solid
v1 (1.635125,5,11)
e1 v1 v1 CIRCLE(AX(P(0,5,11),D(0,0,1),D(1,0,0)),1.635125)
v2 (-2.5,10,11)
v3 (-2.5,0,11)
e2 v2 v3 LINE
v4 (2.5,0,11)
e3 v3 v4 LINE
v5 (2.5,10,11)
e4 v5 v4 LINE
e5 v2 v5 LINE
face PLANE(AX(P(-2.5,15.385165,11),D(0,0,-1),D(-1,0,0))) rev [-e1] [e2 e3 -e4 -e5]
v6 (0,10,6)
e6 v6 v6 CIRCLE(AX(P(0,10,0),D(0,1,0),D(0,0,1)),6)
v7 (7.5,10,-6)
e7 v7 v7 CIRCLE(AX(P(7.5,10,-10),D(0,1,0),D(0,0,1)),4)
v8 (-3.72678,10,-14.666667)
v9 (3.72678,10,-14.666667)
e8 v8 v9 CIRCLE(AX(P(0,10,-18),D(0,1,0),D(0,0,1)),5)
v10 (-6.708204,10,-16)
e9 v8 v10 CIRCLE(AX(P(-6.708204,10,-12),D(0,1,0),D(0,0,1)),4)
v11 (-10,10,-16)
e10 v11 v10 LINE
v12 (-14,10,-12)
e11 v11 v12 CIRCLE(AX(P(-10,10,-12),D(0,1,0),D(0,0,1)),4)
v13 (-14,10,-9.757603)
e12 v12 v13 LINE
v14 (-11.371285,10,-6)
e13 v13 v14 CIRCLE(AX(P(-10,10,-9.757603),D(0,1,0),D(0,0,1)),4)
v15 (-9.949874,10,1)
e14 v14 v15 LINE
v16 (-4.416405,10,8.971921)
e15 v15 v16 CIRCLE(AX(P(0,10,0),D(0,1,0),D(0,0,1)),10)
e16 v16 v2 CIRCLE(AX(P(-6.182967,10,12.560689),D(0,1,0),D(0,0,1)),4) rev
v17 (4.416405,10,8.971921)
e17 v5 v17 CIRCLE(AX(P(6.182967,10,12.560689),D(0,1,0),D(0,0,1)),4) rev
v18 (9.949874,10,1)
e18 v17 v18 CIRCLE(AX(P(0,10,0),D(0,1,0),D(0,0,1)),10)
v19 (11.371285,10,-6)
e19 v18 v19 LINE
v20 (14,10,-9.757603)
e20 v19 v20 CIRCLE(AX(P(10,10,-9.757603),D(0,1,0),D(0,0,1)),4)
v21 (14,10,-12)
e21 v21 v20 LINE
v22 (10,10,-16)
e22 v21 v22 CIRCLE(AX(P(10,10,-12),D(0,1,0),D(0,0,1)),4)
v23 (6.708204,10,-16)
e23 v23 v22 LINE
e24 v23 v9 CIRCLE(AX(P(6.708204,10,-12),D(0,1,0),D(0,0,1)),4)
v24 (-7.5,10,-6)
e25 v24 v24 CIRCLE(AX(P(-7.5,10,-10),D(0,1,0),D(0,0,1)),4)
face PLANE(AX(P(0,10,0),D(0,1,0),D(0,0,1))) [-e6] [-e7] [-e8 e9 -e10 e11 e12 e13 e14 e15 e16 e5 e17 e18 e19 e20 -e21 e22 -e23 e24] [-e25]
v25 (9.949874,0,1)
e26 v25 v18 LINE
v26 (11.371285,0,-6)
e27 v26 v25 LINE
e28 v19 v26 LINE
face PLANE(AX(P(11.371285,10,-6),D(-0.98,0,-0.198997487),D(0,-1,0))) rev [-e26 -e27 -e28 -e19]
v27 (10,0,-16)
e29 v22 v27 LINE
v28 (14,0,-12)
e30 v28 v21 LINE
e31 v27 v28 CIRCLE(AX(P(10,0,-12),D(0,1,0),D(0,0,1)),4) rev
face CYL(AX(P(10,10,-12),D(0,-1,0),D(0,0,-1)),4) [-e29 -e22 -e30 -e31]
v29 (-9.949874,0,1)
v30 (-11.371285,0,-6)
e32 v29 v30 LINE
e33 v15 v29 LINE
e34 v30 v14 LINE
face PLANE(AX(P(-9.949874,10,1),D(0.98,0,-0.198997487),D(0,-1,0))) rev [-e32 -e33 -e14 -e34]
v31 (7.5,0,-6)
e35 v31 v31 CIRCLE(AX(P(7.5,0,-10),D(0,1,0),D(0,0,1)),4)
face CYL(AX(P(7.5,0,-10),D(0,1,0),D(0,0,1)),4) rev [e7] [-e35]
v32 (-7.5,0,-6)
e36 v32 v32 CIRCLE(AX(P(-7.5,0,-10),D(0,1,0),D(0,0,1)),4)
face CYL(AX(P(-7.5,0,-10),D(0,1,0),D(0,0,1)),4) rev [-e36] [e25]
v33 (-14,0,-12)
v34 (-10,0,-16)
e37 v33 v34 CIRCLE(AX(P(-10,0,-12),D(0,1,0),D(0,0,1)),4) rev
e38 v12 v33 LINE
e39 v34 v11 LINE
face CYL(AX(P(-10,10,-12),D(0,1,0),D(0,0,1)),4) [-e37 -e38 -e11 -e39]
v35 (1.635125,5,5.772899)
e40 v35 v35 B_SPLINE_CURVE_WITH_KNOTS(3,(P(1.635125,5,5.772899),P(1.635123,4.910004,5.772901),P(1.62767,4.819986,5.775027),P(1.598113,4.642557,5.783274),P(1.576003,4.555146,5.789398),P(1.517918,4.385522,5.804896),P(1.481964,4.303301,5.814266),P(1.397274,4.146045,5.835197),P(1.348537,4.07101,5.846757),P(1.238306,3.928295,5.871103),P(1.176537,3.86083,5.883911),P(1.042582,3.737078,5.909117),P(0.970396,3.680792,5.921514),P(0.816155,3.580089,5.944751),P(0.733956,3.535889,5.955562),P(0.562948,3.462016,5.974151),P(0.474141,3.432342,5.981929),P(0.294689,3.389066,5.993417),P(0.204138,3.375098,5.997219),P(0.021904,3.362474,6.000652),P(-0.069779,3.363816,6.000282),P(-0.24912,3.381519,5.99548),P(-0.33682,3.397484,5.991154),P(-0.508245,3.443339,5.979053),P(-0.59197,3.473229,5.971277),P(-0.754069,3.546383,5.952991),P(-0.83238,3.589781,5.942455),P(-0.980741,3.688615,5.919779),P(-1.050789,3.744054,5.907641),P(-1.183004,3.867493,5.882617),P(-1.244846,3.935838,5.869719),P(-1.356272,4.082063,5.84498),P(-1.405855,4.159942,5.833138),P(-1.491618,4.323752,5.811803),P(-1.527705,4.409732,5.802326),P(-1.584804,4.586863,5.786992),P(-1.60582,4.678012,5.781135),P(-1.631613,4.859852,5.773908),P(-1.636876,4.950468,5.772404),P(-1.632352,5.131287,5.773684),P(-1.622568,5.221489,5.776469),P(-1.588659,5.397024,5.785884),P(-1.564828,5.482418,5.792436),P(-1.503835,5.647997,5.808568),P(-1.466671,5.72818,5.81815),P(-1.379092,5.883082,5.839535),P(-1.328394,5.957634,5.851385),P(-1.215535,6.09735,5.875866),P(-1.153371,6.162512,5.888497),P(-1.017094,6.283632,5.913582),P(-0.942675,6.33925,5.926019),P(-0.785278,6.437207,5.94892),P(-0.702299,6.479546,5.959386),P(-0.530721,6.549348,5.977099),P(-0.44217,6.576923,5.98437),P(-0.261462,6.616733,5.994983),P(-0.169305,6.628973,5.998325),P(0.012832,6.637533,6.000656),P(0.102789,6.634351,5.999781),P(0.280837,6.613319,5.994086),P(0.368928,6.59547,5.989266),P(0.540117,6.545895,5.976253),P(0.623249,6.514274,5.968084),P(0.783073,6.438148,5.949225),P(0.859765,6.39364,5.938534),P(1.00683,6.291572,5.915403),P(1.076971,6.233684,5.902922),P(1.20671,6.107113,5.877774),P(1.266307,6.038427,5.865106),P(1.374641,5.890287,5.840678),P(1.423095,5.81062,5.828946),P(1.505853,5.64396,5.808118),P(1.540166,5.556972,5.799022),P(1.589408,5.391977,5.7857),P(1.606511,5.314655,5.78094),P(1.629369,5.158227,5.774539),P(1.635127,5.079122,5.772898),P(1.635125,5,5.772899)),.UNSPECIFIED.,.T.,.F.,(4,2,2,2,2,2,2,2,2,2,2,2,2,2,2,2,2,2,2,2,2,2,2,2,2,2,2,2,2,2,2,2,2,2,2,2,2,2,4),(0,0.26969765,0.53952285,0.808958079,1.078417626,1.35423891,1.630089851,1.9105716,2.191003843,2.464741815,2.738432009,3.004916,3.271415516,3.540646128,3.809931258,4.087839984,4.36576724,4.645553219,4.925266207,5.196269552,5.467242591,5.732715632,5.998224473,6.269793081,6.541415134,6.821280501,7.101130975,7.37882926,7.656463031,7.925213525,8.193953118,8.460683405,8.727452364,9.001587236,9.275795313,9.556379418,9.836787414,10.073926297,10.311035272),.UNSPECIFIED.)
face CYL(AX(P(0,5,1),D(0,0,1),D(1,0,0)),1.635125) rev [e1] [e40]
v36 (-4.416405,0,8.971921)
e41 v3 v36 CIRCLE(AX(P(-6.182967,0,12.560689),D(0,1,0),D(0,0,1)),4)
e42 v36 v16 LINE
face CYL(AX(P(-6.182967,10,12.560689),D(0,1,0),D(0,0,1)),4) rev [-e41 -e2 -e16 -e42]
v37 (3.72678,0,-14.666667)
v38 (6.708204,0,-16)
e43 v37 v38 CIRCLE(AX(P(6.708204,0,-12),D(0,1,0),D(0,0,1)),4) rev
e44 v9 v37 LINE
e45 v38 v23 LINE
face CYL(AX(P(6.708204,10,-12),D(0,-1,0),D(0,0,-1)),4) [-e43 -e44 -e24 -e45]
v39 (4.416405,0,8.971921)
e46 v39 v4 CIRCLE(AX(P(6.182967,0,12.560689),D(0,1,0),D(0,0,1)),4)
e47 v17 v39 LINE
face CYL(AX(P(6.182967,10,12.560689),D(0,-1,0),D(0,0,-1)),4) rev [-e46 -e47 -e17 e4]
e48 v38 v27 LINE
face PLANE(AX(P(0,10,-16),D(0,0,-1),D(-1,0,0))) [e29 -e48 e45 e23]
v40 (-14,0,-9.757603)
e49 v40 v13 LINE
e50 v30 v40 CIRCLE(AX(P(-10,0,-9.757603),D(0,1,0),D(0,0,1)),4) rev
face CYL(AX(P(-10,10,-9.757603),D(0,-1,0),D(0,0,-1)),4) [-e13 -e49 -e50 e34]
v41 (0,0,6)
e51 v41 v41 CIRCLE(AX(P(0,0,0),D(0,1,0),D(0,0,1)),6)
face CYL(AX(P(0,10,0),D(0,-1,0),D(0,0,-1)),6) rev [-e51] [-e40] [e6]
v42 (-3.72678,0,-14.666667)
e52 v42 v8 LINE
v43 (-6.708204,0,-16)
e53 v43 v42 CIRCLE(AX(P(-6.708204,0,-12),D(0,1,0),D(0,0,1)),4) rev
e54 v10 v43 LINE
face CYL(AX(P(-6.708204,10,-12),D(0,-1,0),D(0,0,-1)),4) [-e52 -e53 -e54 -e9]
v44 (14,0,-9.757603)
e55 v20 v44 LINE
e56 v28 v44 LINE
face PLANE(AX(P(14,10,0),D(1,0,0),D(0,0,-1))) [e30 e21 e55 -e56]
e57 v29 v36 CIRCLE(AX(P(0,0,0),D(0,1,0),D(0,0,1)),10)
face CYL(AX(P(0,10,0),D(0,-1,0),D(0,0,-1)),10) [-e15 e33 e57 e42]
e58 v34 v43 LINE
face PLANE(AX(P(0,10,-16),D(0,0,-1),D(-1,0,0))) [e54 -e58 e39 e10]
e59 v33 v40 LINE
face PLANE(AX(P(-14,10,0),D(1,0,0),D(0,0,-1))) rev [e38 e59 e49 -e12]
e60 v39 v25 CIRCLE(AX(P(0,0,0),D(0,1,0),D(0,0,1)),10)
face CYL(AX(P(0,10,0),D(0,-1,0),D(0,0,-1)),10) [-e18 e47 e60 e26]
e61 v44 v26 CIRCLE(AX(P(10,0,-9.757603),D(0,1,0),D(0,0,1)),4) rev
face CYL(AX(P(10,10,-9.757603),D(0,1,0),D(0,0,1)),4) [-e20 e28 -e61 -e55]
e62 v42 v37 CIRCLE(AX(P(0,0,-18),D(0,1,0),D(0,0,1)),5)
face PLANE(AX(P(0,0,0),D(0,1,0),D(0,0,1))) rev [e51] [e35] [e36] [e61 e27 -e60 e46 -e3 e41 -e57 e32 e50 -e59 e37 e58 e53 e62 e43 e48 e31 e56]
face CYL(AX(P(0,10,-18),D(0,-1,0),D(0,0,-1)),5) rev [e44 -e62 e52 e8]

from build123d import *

# Parameters (mm, degrees)
CROQUIS1_R              = 10
CROQUIS1_R_2            = 6
SALIENTE_EXTRUIR1_DEPTH = 10
CROQUIS2_R              = 4
CORTAR_EXTRUIR1_DEPTH   = 10
CHAFL_N1_DEPTH          = 10
CROQUIS3_W              = 5
CROQUIS3_H              = 2
SALIENTE_EXTRUIR2_DEPTH = 10
CROQUIS4_R              = 1.635125
CORTAR_EXTRUIR2_DEPTH   = 10
REDONDEO2_R             = 4


with BuildPart() as part:
    # Croquis1 → Saliente-Extruir1 (new body)
    # profile 1 of 2: a face of its own
    with BuildSketch(Plane(origin=(0, 0, 0), x_dir=(1, 0, 0), z_dir=(0, 1, 0))):
        Circle(CROQUIS1_R)
        with Locations(Location((0, 0, 0), (0, 0, 270))):
            Circle(CROQUIS1_R_2, mode=Mode.SUBTRACT)
    # profile 2 of 2: a face of its own
    with BuildSketch(Plane(origin=(0, 0, 0), x_dir=(1, 0, 0), z_dir=(0, 1, 0))):
        with BuildLine():
            Line((-14, 16), (-4.582575695, 16))
            ThreePointArc((-4.582575695, 16), (0, 13), (4.582575695, 16))
            Line((4.582575695, 16), (14, 16))
            Line((14, 16), (14, 6))
            Line((14, 6), (-14, 6))
            Line((-14, 6), (-14, 16))
        make_face()
    extrude(amount=SALIENTE_EXTRUIR1_DEPTH)

    # Croquis2 → Cortar-Extruir1 (cut)
    with BuildSketch(Plane(origin=(0, 10, 0), x_dir=(1, 0, 0), z_dir=(0, 1, 0))):
        with Locations(Location((-7.5, 10, 0), (0, 0, 270))):
            Circle(CROQUIS2_R)
        with Locations(Location((7.5, 10, 0), (0, 0, 270))):
            Circle(CROQUIS2_R)
    extrude(amount=-CORTAR_EXTRUIR1_DEPTH, mode=Mode.SUBTRACT)

    # Chaflán1: read off the stored shape, not the designer's step
    # Chaflán1 outline → Chaflán1 (add)
    with BuildSketch(Plane(origin=(0, 0, 0), x_dir=(1, 0, 0), z_dir=(0, 1, 0))):
        with BuildLine():
            ThreePointArc((8, 6), (9.633249581, 2.68337521), (9.949874371, -1))
            Line((9.949874371, -1), (11.371284996, 6))
            Line((11.371284996, 6), (8, 6))
        make_face()
        with BuildLine():
            Line((-11.371284996, 6), (-9.949874371, -1))
            ThreePointArc((-9.949874371, -1), (-9.633249581, 2.68337521), (-8, 6))
            Line((-8, 6), (-11.371284996, 6))
        make_face()
    extrude(amount=CHAFL_N1_DEPTH)

    # Croquis3 → Saliente-Extruir2 (add)
    with BuildSketch(Plane(origin=(0, 0, 0), x_dir=(1, 0, 0), z_dir=(0, 1, 0))):
        with Locations((0, -10)):
            Rectangle(CROQUIS3_W, CROQUIS3_H)
    extrude(amount=SALIENTE_EXTRUIR2_DEPTH)

    # Croquis4 → Cortar-Extruir2 (cut)
    with BuildSketch(Plane.XY.offset(11)):
        with Locations((0, 5)):
            Circle(CROQUIS4_R)
    extrude(amount=-CORTAR_EXTRUIR2_DEPTH, mode=Mode.SUBTRACT)

    # Redondeo2
    # the kernel refuses this fillet: 4 mm, written as the material it adds along each edge
    with BuildSketch(Plane(origin=(2.5, 10, 9.682458366), x_dir=(0, 0, 1), z_dir=(0, -1, 0))) as redondeo2_piece_1:
        with BuildLine():
            CenterArc((2.878230853, -3.68296744), REDONDEO2_R, 112.965221116, 40.826178459)
            Line((-0.710537495, -1.916405314), (-0.782312862, -1.881074072))
            ThreePointArc((-0.782312862, -1.881074072), (-0.381189036, -0.948592301), (-0.077459667, 0.02))
            Line((-0.077459667, 0.02), (0, 0.08))
            ThreePointArc((0, 0.08), (0.658770817, 0.08), (1.28632785, 0.073659349))
            Line((1.28632785, 0.073659349), (1.317541634, 0))
        make_face()
    extrude(amount=10)
    with BuildSketch(Plane(origin=(-2.5, 10, 9.682458366), x_dir=(-0.9376279565956984, 0, -0.3476403529657844), z_dir=(0, -1, 0))) as redondeo2_piece_2:
        with BuildLine():
            CenterArc((2.452664045, -3.979057814), REDONDEO2_R, 95.865544119, 40.826178459)
            Line((-0.458030639, -1.23536387), (-0.516244533, -1.180489992))
            ThreePointArc((-0.516244533, -1.180489992), (-0.304025556, -0.589870707), (-0.075010237, 0.027811228))
            Line((-0.075010237, 0.027811228), (0.008175547, 0.079581156))
            ThreePointArc((0.008175547, 0.079581156), (1.021943352, 0.027644534), (2.035711158, 0.079581156))
            Line((2.035711158, 0.079581156), (2.043886705, 0))
        make_face()
    extrude(amount=10)
    # the kernel refuses this fillet: 4 mm, written as the material it takes off along each edge
    with BuildSketch(Plane(origin=(4.582575695, -5.314070594, -16), x_dir=(-0.5401558180759948, 0, 0.8415650255319863), z_dir=(0, 1, 0))) as redondeo2_2_piece_1:
        with BuildLine():
            CenterArc((2.218089643, 3.949477654), REDONDEO2_R, 212.694246687, 48.189685104)
            Line((-1.14817046, 1.788854382), (-1.215495662, 1.745641917))
            Line((-1.215495662, 1.745641917), (-0.067325202, -0.043212465))
            Line((-0.067325202, -0.043212465), (0.012674798, -0.078989553))
            ThreePointArc((0.012674798, -0.078989553), (0.792174872, -0.016847068), (1.571674947, -0.078989553))
            Line((1.571674947, -0.078989553), (1.584349745, 0))
        make_face()
    extrude(amount=20.628141188, mode=Mode.SUBTRACT)
    with BuildSketch(Plane(origin=(14, -10, -16), x_dir=(-1, 0, 0), z_dir=(0, 1, 0)), Plane(origin=(-14, -10, -16), x_dir=(0, 0, 1), z_dir=(0, 1, 0))) as redondeo2_2_piece_2:
        with BuildLine():
            CenterArc((REDONDEO2_R, REDONDEO2_R), REDONDEO2_R, 180, 90)
            Line((0, REDONDEO2_R), (-REDONDEO2_R * 0.02, REDONDEO2_R))
            Line((-REDONDEO2_R * 0.02, REDONDEO2_R), (-REDONDEO2_R * 0.02, -REDONDEO2_R * 0.02))
            Line((-REDONDEO2_R * 0.02, -REDONDEO2_R * 0.02), (REDONDEO2_R, -REDONDEO2_R * 0.02))
            Line((REDONDEO2_R, -REDONDEO2_R * 0.02), (REDONDEO2_R, 0))
        make_face()
    extrude(amount=30, mode=Mode.SUBTRACT)
    with BuildSketch(Plane(origin=(-4.582575695, -5.314070594, -16), x_dir=(-1, 0, 0), z_dir=(0, 1, 0))) as redondeo2_2_piece_3:
        with BuildLine():
            CenterArc((2.125628238, 4), REDONDEO2_R, 221.810314896, 48.189685104)
            Line((-0.855795732, 1.333333333), (-0.915424212, 1.28))
            ThreePointArc((-0.915424212, 1.28), (-0.442075769, 0.657566625), (-0.073321211, -0.032))
            Line((-0.073321211, -0.032), (0, -0.08))
            Line((0, -0.08), (2.125628238, -0.08))
            Line((2.125628238, -0.08), (2.125628238, 0))
        make_face()
    extrude(amount=20.628141188, mode=Mode.SUBTRACT)
    with BuildSketch(Plane(origin=(14, -9.394006553, -6), x_dir=(0, 0, -1), z_dir=(0, 1, 0))) as redondeo2_2_piece_4:
        with BuildLine():
            CenterArc((3.757602621, 4), REDONDEO2_R, 200.048853319, 69.951146681)
            Line((0, 2.628715004), (-0.075152052, 2.601289304))
            ThreePointArc((-0.075152052, 2.601289304), (-0.08, 1.314357502), (-0.08, 0))
            Line((-0.08, 0), (0, -0.08))
            Line((0, -0.08), (3.757602621, -0.08))
            Line((3.757602621, -0.08), (3.757602621, 0))
        make_face()
    extrude(amount=28.788013107, mode=Mode.SUBTRACT)
    with BuildSketch(Plane(origin=(-14, -9.394006553, -6), x_dir=(1, 0, 0), z_dir=(0, 1, 0))) as redondeo2_2_piece_5:
        with BuildLine():
            CenterArc((4, 3.757602621), REDONDEO2_R, 180, 69.951146681)
            Line((0, 3.757602621), (-0.08, 3.757602621))
            Line((-0.08, 3.757602621), (-0.08, 0))
            Line((-0.08, 0), (0, -0.08))
            ThreePointArc((0, -0.08), (1.314357502, -0.08), (2.601289304, -0.075152052))
            Line((2.601289304, -0.075152052), (2.628715004, 0))
        make_face()
    extrude(amount=28.788013107, mode=Mode.SUBTRACT)


solid = part.part
